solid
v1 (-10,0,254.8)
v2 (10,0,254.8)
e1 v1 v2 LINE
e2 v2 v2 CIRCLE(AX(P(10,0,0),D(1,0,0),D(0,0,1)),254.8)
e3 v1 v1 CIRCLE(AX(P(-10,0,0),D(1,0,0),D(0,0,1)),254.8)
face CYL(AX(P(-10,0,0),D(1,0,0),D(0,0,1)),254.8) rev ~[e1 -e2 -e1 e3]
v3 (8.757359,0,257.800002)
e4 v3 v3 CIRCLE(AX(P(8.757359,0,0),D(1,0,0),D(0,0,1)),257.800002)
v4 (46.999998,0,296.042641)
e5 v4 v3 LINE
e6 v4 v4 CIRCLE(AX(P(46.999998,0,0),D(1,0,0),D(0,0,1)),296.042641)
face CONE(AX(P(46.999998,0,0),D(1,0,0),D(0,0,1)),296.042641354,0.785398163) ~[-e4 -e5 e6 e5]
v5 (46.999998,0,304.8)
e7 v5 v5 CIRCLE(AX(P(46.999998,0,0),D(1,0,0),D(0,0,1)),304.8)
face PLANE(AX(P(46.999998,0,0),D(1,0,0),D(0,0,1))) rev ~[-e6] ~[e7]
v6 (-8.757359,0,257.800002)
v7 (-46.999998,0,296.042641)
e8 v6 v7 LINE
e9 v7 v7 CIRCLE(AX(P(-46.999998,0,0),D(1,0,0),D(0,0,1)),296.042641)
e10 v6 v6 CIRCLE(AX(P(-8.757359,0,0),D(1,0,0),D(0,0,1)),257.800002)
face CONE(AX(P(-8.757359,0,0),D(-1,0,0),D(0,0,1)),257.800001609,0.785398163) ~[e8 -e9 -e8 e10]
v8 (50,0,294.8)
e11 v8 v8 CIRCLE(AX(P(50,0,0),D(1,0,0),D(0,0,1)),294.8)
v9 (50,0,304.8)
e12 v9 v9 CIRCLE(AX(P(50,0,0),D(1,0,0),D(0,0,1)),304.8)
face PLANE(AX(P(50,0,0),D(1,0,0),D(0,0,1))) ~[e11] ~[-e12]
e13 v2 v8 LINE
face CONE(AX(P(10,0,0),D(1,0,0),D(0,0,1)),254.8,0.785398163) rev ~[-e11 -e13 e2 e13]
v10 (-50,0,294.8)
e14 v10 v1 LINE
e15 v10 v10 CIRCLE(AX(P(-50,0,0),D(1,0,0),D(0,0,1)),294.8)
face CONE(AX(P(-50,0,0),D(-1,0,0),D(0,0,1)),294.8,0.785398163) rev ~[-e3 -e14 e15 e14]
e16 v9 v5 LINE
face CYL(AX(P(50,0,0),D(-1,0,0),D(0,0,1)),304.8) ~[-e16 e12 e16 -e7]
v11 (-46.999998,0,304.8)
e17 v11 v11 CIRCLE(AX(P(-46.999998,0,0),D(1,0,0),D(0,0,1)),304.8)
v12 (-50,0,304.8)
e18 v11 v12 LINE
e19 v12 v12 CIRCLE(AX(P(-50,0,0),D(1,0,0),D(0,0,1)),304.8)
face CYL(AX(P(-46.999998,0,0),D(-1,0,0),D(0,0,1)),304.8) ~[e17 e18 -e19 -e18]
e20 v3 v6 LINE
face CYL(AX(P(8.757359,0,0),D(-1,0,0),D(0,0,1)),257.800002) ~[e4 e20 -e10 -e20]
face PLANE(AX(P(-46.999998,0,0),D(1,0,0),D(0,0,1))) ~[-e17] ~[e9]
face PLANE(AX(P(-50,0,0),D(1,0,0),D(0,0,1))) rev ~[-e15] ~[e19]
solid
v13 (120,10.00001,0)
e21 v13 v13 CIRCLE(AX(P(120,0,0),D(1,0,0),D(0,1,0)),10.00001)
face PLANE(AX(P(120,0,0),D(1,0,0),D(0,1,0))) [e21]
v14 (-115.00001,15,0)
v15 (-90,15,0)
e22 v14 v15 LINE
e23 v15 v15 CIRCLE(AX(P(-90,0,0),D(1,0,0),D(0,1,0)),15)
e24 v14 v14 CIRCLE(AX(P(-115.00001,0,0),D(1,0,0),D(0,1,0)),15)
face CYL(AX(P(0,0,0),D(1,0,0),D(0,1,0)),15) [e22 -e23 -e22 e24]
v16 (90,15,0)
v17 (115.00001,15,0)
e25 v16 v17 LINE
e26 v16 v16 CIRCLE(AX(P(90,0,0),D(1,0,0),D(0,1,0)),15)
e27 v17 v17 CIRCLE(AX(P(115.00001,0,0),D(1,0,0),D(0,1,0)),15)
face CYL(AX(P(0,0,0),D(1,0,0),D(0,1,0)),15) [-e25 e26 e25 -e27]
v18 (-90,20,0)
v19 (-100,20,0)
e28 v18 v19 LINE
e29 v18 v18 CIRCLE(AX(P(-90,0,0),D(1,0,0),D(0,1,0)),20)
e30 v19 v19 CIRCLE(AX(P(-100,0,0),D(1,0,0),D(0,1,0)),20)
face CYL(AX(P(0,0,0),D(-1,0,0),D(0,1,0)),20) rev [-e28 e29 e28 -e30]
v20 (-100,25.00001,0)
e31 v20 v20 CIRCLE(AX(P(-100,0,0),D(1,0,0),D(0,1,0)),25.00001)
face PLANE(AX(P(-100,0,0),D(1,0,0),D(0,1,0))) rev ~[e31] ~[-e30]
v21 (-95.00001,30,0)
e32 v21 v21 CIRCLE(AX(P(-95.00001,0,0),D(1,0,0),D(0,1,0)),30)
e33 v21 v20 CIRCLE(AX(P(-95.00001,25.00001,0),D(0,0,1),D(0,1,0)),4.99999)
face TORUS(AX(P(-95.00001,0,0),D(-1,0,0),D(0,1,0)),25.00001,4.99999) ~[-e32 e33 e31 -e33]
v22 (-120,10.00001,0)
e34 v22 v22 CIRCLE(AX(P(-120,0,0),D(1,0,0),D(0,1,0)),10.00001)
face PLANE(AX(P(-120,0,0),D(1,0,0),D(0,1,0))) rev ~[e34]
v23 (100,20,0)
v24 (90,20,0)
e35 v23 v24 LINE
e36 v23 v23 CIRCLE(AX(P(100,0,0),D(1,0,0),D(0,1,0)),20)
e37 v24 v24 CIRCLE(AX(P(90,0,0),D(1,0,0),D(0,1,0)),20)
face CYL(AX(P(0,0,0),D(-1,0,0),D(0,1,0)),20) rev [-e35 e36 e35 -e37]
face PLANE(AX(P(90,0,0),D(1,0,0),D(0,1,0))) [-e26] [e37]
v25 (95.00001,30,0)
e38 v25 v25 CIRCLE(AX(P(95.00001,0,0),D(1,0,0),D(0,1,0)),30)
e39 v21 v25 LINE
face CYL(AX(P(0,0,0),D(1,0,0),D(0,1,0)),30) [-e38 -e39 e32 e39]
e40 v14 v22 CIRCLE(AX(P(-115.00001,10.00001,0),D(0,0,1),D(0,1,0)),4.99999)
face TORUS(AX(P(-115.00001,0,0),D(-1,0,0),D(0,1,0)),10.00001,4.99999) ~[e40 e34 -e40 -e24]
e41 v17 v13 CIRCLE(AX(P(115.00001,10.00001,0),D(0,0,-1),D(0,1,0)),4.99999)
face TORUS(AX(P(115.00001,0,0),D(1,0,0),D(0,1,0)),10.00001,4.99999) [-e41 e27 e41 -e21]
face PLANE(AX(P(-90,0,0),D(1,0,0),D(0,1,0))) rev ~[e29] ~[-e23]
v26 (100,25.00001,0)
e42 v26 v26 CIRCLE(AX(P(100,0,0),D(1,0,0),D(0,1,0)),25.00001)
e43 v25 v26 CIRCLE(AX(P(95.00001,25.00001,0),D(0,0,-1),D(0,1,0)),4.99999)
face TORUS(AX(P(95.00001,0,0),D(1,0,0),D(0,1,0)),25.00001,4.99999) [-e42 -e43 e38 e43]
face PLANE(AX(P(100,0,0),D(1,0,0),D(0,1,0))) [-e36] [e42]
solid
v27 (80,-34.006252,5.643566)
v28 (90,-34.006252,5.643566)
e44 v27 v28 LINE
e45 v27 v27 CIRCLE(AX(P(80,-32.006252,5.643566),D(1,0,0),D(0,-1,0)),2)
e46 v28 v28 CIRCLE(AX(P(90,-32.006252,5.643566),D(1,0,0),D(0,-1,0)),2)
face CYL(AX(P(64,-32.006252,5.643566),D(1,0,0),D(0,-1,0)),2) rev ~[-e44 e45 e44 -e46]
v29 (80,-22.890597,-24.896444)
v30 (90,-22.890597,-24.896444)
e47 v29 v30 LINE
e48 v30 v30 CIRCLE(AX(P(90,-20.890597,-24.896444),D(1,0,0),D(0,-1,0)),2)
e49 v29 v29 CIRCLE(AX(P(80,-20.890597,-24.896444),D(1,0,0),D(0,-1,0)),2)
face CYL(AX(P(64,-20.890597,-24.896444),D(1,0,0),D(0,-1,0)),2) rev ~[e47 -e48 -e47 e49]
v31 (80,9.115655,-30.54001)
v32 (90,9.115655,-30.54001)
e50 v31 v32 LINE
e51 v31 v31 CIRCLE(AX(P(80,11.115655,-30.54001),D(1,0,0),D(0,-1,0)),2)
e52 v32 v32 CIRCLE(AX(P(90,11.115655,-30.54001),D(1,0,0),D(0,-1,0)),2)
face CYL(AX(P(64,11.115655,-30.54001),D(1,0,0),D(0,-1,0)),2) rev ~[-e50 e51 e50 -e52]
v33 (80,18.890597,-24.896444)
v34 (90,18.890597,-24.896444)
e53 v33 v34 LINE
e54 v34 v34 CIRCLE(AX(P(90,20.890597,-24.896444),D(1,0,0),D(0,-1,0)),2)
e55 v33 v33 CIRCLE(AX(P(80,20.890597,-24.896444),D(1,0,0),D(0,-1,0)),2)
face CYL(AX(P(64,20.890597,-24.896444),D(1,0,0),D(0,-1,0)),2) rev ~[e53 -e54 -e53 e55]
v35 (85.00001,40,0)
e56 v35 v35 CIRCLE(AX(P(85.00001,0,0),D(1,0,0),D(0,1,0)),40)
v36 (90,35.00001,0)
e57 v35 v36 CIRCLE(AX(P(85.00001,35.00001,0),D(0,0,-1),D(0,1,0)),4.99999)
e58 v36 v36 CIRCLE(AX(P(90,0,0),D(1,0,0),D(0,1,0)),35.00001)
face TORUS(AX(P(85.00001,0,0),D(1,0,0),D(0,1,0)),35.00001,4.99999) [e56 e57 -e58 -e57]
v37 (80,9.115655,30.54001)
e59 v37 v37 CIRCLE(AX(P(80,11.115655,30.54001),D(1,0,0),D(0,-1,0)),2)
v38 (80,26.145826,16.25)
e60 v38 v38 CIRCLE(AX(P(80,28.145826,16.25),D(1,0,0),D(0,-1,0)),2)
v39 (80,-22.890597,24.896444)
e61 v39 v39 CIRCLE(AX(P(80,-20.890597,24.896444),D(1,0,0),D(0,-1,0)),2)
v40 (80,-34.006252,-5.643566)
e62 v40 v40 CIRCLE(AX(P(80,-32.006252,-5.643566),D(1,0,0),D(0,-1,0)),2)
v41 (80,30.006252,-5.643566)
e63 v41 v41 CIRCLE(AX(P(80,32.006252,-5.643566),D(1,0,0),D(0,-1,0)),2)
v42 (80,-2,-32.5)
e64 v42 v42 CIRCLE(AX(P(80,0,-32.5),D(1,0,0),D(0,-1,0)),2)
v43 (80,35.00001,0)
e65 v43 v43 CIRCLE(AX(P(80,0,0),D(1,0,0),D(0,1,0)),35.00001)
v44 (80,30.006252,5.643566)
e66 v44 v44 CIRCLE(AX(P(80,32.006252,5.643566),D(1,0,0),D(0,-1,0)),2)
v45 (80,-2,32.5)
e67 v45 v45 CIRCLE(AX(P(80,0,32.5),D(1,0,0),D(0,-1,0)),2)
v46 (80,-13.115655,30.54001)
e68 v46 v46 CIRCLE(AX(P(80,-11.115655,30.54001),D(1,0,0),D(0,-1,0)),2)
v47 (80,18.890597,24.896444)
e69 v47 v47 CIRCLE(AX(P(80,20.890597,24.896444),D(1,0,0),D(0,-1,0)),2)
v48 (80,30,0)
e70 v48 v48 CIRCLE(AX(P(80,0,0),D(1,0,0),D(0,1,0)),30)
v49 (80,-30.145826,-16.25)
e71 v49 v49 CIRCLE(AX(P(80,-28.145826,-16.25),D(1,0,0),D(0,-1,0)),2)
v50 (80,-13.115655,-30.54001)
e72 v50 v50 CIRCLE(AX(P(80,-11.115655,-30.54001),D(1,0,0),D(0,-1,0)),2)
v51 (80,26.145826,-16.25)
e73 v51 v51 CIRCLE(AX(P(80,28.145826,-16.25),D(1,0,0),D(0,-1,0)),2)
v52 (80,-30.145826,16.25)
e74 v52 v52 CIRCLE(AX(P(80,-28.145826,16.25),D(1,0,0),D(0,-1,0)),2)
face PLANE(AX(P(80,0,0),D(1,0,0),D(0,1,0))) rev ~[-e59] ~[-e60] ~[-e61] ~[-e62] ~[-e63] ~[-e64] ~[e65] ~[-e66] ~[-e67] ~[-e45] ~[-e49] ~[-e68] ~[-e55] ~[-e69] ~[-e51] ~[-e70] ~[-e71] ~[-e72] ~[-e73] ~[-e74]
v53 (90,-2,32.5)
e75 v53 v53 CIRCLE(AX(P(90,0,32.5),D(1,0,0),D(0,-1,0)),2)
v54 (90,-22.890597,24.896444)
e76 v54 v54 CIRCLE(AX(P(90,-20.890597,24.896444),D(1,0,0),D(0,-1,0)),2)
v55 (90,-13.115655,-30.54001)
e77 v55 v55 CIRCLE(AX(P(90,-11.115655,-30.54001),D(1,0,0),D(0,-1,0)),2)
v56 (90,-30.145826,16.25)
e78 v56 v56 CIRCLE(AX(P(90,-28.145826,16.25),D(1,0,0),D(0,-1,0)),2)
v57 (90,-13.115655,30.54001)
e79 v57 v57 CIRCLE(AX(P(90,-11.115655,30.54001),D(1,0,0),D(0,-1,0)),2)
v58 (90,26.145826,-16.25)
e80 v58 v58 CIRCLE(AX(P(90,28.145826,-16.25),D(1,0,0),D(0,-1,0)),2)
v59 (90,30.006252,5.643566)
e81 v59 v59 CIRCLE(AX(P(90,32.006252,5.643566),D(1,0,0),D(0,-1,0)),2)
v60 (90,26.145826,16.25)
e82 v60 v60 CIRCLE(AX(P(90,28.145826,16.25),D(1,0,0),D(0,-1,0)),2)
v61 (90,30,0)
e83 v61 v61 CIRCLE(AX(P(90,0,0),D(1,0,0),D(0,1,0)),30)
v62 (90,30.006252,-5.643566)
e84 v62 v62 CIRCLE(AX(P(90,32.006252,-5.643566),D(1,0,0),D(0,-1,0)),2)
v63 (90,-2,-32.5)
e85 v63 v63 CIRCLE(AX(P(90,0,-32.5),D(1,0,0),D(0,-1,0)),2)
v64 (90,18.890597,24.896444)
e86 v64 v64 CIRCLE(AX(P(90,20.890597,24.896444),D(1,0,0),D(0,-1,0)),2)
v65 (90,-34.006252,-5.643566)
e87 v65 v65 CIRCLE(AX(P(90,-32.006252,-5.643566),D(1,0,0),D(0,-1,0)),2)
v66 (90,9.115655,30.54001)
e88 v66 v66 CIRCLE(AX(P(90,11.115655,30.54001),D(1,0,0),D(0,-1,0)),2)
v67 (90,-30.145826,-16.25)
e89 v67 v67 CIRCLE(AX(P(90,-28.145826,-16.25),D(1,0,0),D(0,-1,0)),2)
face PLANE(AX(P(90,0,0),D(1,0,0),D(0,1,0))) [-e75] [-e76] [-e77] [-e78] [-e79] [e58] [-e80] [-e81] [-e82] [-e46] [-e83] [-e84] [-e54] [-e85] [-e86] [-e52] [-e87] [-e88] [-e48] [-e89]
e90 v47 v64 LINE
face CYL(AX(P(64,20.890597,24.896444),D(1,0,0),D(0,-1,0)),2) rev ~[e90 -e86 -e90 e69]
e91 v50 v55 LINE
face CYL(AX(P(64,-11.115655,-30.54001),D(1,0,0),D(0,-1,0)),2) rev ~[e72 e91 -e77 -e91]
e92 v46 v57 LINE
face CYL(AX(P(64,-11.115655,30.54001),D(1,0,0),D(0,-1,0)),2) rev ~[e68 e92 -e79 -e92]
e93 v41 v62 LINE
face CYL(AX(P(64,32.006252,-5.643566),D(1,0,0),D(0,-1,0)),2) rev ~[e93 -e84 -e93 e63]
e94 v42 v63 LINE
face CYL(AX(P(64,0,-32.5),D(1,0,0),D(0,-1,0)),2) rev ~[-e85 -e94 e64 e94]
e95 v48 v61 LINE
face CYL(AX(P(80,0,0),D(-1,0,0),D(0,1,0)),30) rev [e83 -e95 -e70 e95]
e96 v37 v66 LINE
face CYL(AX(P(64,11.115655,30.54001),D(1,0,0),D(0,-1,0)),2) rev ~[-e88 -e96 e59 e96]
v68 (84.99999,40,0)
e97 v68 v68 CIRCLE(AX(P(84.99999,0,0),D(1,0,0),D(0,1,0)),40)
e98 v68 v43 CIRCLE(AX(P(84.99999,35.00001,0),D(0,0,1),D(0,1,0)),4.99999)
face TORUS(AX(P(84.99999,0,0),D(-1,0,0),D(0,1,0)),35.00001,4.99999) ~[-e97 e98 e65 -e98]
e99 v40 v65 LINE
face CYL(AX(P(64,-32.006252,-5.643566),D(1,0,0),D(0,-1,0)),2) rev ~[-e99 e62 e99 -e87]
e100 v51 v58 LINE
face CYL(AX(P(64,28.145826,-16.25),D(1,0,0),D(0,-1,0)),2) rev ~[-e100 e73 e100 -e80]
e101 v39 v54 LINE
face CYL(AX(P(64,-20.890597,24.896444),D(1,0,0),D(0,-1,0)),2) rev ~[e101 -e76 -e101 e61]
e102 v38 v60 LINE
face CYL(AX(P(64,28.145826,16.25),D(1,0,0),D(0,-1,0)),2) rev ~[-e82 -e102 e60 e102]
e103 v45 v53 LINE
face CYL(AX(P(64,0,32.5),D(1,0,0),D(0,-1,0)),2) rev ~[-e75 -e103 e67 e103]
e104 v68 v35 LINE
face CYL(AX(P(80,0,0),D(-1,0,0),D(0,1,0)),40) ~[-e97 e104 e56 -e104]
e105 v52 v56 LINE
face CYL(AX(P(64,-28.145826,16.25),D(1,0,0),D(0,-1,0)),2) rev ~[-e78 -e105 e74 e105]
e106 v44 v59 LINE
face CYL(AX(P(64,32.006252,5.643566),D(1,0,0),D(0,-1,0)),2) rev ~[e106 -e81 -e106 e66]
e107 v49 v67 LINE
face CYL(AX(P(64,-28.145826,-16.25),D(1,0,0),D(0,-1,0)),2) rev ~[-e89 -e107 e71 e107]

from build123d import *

# Parameters (mm, degrees)
F2_R     = 15
F3_DEPTH = 120
F4_R     = 20
F4_R_2   = 15
F5_DEPTH = 90
F4_R_3   = 30
F6_DEPTH = 100
F7_START = 80
F4_R_4   = 40
F7_DEPTH = 10
F8_R     = 4.99999
F8_2_R   = 4.99999
F9_D     = 4
F9_DEPTH = 16
F9_START = 80
F9_TIP   = 1.2017212381


# Not quite as in the source:
# - a fillet or chamfer is up to 0.001 mm smaller than in the source, because OpenCascade refuses the exact size


with BuildPart() as f1:
    # F0 (on Front) → F1 (revolve)
    with BuildSketch(Plane.XZ):
        Polygon((-50, 304.8), (-50, 294.8), (-10, 254.8), (0, 254.8), (10, 254.8), (50, 294.8), (50, 304.8), (46.9999983907, 304.8), (46.9999983907, 296.0426413537), (8.7573586463, 257.8000016093), (0, 257.8000016093), (-8.7573586463, 257.8000016093), (-46.9999983907, 296.0426413537), (-46.9999983907, 304.8), align=None)
    revolve(axis=Axis((62.5034868717, 0, 0), (1, 0, 0)))


with BuildPart() as f3:
    # F2 (on Right) → F3 (new body, symmetric)
    with BuildSketch(Plane.YZ):
        Circle(F2_R)
    extrude(amount=F3_DEPTH, both=True)

    # F4 (on Right) → F5 (join, symmetric)
    with BuildSketch(Plane.YZ):
        Circle(F4_R)
        Circle(F4_R_2, mode=Mode.SUBTRACT)
    extrude(amount=F5_DEPTH, both=True)

    # F4 (on Right) → F6 (join, symmetric)
    with BuildSketch(Plane.YZ):
        Circle(F4_R_3)
        Circle(F4_R, mode=Mode.SUBTRACT)
    extrude(amount=F6_DEPTH, both=True)

    # F8 (radius 5 in the source; OpenCascade refuses exactly that, so slightly less here)
    f8_edges = [f3.edges().sort_by_distance(p)[0] for p in [
        (120, -15, 0),
        (-120, -15, 0),
        (-100, -30, 0),
        (100, -30, 0),
    ]]
    fillet(f8_edges, radius=F8_R)


with BuildPart() as f7:
    # F4 (on Right) → F7 (new body)
    with BuildSketch(Plane.YZ.offset(F7_START)):
        Circle(F4_R_4)
        Circle(F4_R_3, mode=Mode.SUBTRACT)
    extrude(amount=F7_DEPTH)

    # F8#2 (radius 5 in the source; OpenCascade refuses exactly that, so slightly less here)
    f8_2_edges = [f7.edges().sort_by_distance(p)[0] for p in [
        (80, -40, 0),
        (90, -40, 0),
    ]]
    fillet(f8_2_edges, radius=F8_2_R)

    # F9
    # its depths count from where the whole tool has entered the part; down to there all is cleared
    with Locations(Plane(origin=(0, 0, 0), x_dir=(0, 1, 0), z_dir=(-1, 0, 0))):
        with Locations((0, -32.5), (11.1156546581, -30.5400101755), (20.8905973148, -24.8964444014), (28.145825623, -16.25), (32.0062519729, -5.6435657742), (32.0062519729, 5.6435657742), (28.145825623, 16.25), (20.8905973148, 24.8964444014), (11.1156546581, 30.5400101755), (0, 32.5), (-11.1156546581, 30.5400101755), (-20.8905973148, 24.8964444014), (-20.8905973148, 24.8964444014), (-28.145825623, 16.25), (-32.0062519729, 5.6435657742), (-32.0062519729, -5.6435657742), (-28.145825623, -16.25), (-20.8905973148, -24.8964444014), (-11.1156546581, -30.5400101755)):
            Hole(F9_D / 2, depth=F9_START)
    with Locations(Plane(origin=(0, 0, 0), x_dir=(0, 1, 0), z_dir=(-1, 0, 0)).offset(-F9_START)):
        with Locations((0, -32.5), (11.1156546581, -30.5400101755), (20.8905973148, -24.8964444014), (28.145825623, -16.25), (32.0062519729, -5.6435657742), (32.0062519729, 5.6435657742), (28.145825623, 16.25), (20.8905973148, 24.8964444014), (11.1156546581, 30.5400101755), (0, 32.5), (-11.1156546581, 30.5400101755), (-20.8905973148, 24.8964444014), (-20.8905973148, 24.8964444014), (-28.145825623, 16.25), (-32.0062519729, 5.6435657742), (-32.0062519729, -5.6435657742), (-28.145825623, -16.25), (-20.8905973148, -24.8964444014), (-11.1156546581, -30.5400101755)):
            Hole(F9_D / 2, depth=F9_DEPTH)
            with Locations((0, 0, -(F9_DEPTH + F9_TIP / 2))):  # 118° drill point
                Cone(0, F9_D / 2, F9_TIP, mode=Mode.SUBTRACT)


solid = Compound([f1.part, f3.part, f7.part])
